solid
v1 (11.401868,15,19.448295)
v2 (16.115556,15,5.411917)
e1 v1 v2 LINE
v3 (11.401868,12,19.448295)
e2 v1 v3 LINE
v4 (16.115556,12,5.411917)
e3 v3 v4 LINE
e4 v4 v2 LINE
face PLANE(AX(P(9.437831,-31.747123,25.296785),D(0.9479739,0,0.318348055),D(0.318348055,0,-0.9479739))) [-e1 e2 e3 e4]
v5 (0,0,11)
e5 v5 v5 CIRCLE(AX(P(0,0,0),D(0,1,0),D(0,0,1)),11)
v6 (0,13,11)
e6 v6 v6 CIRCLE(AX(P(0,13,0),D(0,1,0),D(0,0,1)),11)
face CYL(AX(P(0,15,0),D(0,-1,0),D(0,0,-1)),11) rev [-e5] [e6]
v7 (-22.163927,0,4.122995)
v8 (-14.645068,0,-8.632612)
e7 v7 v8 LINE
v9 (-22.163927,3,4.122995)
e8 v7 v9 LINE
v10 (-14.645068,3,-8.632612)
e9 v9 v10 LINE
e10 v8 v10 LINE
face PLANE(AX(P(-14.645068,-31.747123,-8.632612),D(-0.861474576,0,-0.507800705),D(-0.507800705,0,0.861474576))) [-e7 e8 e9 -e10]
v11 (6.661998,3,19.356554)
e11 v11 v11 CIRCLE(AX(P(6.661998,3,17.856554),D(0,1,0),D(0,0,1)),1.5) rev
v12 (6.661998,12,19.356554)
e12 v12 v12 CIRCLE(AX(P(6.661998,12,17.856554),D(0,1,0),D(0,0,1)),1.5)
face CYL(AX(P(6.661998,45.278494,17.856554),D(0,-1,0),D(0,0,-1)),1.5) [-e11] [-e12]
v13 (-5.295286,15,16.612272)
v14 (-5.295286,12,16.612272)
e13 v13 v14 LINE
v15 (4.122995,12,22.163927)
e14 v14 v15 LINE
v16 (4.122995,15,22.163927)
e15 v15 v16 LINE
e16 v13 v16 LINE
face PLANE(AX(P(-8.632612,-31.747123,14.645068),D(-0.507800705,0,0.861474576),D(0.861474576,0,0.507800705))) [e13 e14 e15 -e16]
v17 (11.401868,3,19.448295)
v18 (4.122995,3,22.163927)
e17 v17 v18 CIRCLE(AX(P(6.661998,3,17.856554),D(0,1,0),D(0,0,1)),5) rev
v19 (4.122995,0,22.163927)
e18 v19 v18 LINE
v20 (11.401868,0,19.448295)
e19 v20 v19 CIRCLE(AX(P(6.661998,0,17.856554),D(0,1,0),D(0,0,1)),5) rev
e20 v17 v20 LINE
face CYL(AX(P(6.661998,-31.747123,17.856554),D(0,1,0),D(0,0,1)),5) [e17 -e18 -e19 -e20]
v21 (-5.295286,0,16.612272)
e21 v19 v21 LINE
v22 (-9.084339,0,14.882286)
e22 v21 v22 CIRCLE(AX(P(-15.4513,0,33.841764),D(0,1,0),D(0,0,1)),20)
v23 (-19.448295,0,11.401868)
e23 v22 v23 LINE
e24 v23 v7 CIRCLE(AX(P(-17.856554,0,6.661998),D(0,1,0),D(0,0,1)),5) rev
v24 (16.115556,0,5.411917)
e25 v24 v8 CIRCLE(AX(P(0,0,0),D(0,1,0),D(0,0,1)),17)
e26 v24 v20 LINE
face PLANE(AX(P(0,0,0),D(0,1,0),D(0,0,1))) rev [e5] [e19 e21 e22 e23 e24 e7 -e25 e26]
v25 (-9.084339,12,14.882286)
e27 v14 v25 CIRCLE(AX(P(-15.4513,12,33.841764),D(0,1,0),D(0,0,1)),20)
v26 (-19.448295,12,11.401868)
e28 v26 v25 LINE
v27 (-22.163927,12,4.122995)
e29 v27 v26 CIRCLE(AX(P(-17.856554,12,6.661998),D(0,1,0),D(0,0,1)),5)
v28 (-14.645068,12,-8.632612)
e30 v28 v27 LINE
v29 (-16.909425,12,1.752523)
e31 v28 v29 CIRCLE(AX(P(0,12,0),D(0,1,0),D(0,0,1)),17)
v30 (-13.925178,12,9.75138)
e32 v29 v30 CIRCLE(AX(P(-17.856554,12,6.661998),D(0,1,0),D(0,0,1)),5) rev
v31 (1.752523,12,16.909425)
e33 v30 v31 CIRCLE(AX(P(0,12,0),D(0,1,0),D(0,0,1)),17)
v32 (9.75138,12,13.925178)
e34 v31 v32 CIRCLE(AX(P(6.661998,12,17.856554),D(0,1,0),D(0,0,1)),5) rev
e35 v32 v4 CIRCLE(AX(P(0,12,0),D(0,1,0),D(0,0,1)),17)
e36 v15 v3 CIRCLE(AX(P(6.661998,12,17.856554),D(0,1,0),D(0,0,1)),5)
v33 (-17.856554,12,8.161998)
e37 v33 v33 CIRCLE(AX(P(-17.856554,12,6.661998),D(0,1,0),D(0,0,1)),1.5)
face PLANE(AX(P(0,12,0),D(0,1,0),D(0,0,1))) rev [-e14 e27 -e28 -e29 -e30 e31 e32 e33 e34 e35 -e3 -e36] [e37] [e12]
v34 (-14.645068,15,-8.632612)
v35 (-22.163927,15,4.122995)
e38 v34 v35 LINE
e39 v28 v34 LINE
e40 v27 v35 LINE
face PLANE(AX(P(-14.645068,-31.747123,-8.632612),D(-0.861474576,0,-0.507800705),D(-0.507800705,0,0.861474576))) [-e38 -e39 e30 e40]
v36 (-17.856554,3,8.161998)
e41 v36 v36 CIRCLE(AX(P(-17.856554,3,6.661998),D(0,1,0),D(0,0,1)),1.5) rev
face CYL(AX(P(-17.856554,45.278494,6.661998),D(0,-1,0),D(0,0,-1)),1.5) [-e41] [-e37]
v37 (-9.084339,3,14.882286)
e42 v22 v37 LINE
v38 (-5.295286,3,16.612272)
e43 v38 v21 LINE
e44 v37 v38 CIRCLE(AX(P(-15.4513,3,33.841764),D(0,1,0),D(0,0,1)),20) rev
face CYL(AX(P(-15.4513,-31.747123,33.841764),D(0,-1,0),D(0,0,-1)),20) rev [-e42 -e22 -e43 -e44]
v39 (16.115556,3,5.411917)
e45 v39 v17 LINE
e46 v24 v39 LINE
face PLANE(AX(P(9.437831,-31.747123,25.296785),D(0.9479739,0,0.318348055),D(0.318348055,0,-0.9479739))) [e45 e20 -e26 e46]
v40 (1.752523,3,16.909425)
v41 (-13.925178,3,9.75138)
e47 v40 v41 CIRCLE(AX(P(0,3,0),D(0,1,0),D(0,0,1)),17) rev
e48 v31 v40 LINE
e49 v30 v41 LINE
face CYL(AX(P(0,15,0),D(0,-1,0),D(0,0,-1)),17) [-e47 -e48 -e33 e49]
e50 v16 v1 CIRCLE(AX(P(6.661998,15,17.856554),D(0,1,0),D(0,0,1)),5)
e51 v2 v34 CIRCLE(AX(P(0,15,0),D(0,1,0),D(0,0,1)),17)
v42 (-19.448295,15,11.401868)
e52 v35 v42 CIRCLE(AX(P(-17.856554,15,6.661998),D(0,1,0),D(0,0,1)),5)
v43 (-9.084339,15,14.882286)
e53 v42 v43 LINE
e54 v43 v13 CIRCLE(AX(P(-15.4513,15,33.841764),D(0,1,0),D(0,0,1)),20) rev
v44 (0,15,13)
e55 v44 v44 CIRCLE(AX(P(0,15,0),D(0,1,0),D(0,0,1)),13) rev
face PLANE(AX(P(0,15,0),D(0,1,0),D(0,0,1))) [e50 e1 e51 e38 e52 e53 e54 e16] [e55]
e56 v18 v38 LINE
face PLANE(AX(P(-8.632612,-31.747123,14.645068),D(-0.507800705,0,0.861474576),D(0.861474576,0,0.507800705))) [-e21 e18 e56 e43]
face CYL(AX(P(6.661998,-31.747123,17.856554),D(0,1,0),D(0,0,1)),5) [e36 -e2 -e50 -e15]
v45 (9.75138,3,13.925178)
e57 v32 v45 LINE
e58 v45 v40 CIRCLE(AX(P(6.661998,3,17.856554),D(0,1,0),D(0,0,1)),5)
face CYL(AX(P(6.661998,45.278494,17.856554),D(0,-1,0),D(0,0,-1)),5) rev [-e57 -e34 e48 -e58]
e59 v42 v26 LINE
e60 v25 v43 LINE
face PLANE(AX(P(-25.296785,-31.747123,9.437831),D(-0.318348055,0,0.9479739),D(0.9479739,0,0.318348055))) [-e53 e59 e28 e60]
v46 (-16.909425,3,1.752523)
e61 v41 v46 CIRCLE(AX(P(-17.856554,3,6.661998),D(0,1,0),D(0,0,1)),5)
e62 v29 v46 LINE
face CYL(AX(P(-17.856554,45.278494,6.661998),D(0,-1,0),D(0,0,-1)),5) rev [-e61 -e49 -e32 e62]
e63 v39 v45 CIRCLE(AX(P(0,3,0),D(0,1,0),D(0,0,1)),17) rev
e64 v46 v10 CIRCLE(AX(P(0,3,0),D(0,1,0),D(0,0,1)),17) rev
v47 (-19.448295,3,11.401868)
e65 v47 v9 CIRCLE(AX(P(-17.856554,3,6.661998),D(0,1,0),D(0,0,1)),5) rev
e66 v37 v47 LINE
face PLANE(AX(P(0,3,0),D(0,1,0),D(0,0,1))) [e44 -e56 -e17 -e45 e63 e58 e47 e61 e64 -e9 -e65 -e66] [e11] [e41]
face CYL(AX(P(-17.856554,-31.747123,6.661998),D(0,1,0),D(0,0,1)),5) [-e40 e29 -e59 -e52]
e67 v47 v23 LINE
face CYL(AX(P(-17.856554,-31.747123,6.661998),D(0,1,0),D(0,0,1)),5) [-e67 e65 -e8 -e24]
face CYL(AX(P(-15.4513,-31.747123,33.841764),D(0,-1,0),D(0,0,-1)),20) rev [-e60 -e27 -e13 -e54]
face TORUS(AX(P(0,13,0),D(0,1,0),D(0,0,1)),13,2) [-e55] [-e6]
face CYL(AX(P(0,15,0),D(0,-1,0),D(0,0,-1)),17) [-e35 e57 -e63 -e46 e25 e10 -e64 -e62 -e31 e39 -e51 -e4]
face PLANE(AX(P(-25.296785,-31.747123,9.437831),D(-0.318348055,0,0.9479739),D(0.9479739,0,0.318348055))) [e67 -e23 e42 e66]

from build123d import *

# Parameters (mm, degrees)
SKETCH1_R               = 17
SKETCH1_R_2             = 11
BOSS_EXTRUDE1_DEPTH     = 15
BOSS_EXTRUDE2_START     = -15
BOSS_EXTRUDE2_DEPTH     = 15
FILLET1_R               = 5
CUT_EXTRUDE1_START      = -12
SKETCH3_R               = 1.5
CUT_EXTRUDE1_DEPTH      = 9
CIRPATTERN1_START       = 3
CIRPATTERN1_DEPTH       = 9
CIRPATTERN1_2_DEPTH     = 3
CIRPATTERN1_START_2     = 12
CIRPATTERN1_3_DEPTH     = 3
CIRPATTERN1_4_OUTLINE_R = 1.5
CIRPATTERN1_4_DEPTH     = 9
FILLET2_R               = 20
FILLET3_R               = 2


# Read off the part's stored shape, not the designer's step: CirPattern1
with BuildPart() as part:
    # Sketch1 → Boss-Extrude1 (new body)
    with BuildSketch(Plane(origin=(0, 0, 0), x_dir=(1, 0, 0), z_dir=(0, 1, 0))):
        with Locations(Location((0, 0, 0), (0, 0, 270))):
            Circle(SKETCH1_R)
        with Locations(Location((0, 0, 0), (0, 0, 270))):
            Circle(SKETCH1_R_2, mode=Mode.SUBTRACT)
    extrude(amount=BOSS_EXTRUDE1_DEPTH)

    # Sketch2 → Boss-Extrude2 (add)
    with BuildSketch(Plane(origin=(0, 15, 0), x_dir=(1, 0, 0), z_dir=(0, 1, 0)).offset(BOSS_EXTRUDE2_START)):
        with BuildLine():
            Line((-8.632611981, -14.645067784), (9.437831165, -25.296785229))
            Line((9.437831165, -25.296785229), (16.115556306, -5.411916938))
            ThreePointArc((16.115556306, -5.411916938), (5.942338141, -15.927605514), (-8.632611981, -14.645067784))
        make_face()
    extrude(amount=BOSS_EXTRUDE2_DEPTH)

    # Fillet1
    fillet1_edges = [part.edges().sort_by_distance(p)[0] for p in [
        (9.437831165, 7.5, 25.296785229),
    ]]
    fillet(fillet1_edges, radius=FILLET1_R)

    # Sketch3 → Cut-Extrude1 (cut)
    with BuildSketch(Plane(origin=(0, 15, 0), x_dir=(1, 0, 0), z_dir=(0, 1, 0)).offset(CUT_EXTRUDE1_START)):
        with BuildLine():
            ThreePointArc((1.752523284, -16.909425246), (-3.621565103, -16.609764183), (-8.632611981, -14.645067784))
            Line((-8.632611981, -14.645067784), (4.122994946, -22.163927157))
            ThreePointArc((4.122994946, -22.163927157), (8.409744981, -22.541144136), (11.401867971, -19.448294555))
            Line((11.401867971, -19.448294555), (16.115556306, -5.411916938))
            ThreePointArc((16.115556306, -5.411916938), (13.615928399, -10.178727515), (9.751380337, -13.925177971))
            ThreePointArc((9.751380337, -13.925177971), (4.914251957, -13.171964422), (1.752523284, -16.909425246))
        make_face()
        with Locations(Location((6.661998469, -17.856554279, 0), (0, 0, 270))):
            Circle(SKETCH3_R, mode=Mode.SUBTRACT)
    extrude(amount=CUT_EXTRUDE1_DEPTH, mode=Mode.SUBTRACT)

    # CirPattern1 outline → CirPattern1 (cut)
    with BuildSketch(Plane(origin=(0, 0, 0), x_dir=(1, 0, 0), z_dir=(0, 1, 0)).offset(CIRPATTERN1_START)):
        with BuildLine():
            ThreePointArc((-13.925177971, -9.751380337), (-13.171964422, -4.914251957), (-16.909425246, -1.752523284))
            ThreePointArc((-16.909425246, -1.752523284), (-15.927605515, -5.942338141), (-13.925177971, -9.751380337))
        make_face()
    extrude(amount=CIRPATTERN1_DEPTH, mode=Mode.SUBTRACT)

    # CirPattern1 2 outline → CirPattern1 2 (add)
    with BuildSketch(Plane(origin=(0, 0, 0), x_dir=(1, 0, 0), z_dir=(0, 1, 0))):
        with BuildLine():
            Line((-14.645067784, 8.632611981), (-22.163927157, -4.122994946))
            ThreePointArc((-22.163927157, -4.122994946), (-22.541144136, -8.409744981), (-19.448294555, -11.401867971))
            Line((-19.448294555, -11.401867971), (-7.099245913, -15.548918451))
            Line((-7.099245913, -15.548918451), (-8.632611981, -14.645067784))
            ThreePointArc((-8.632611981, -14.645067784), (-16.459805212, -4.25144827), (-14.645067784, 8.632611981))
        make_face()
    extrude(amount=CIRPATTERN1_2_DEPTH)

    # CirPattern1 3 outline → CirPattern1 3 (add)
    with BuildSketch(Plane(origin=(0, 0, 0), x_dir=(1, 0, 0), z_dir=(0, 1, 0)).offset(CIRPATTERN1_START_2)):
        with BuildLine():
            Line((-14.645067784, 8.632611981), (-22.163927157, -4.122994946))
            ThreePointArc((-22.163927157, -4.122994946), (-22.541144136, -8.409744981), (-19.448294555, -11.401867971))
            Line((-19.448294555, -11.401867971), (-7.099245913, -15.548918451))
            Line((-7.099245913, -15.548918451), (-8.632611981, -14.645067784))
            ThreePointArc((-8.632611981, -14.645067784), (-16.459805212, -4.25144827), (-14.645067784, 8.632611981))
        make_face()
    extrude(amount=CIRPATTERN1_3_DEPTH)

    # CirPattern1 4 outline → CirPattern1 4 (add)
    with BuildSketch(Plane(origin=(0, 0, 0), x_dir=(1, 0, 0), z_dir=(0, 1, 0)).offset(CIRPATTERN1_START)):
        with Locations((-17.856554279, -6.661998469)):
            Circle(CIRPATTERN1_4_OUTLINE_R)
    extrude(amount=CIRPATTERN1_4_DEPTH)

    # Fillet2
    fillet2_edges = [part.edges().sort_by_distance(p)[0] for p in [
        (-7.099245913, 13.5, 15.548918451),
        (-7.099245913, 1.5, 15.548918451),
    ]]
    fillet(fillet2_edges, radius=FILLET2_R)

    # Fillet3
    fillet3_edges = [part.edges().sort_by_distance(p)[0] for p in [
        (0, 15, -11),
    ]]
    fillet(fillet3_edges, radius=FILLET3_R)


solid = part.part
